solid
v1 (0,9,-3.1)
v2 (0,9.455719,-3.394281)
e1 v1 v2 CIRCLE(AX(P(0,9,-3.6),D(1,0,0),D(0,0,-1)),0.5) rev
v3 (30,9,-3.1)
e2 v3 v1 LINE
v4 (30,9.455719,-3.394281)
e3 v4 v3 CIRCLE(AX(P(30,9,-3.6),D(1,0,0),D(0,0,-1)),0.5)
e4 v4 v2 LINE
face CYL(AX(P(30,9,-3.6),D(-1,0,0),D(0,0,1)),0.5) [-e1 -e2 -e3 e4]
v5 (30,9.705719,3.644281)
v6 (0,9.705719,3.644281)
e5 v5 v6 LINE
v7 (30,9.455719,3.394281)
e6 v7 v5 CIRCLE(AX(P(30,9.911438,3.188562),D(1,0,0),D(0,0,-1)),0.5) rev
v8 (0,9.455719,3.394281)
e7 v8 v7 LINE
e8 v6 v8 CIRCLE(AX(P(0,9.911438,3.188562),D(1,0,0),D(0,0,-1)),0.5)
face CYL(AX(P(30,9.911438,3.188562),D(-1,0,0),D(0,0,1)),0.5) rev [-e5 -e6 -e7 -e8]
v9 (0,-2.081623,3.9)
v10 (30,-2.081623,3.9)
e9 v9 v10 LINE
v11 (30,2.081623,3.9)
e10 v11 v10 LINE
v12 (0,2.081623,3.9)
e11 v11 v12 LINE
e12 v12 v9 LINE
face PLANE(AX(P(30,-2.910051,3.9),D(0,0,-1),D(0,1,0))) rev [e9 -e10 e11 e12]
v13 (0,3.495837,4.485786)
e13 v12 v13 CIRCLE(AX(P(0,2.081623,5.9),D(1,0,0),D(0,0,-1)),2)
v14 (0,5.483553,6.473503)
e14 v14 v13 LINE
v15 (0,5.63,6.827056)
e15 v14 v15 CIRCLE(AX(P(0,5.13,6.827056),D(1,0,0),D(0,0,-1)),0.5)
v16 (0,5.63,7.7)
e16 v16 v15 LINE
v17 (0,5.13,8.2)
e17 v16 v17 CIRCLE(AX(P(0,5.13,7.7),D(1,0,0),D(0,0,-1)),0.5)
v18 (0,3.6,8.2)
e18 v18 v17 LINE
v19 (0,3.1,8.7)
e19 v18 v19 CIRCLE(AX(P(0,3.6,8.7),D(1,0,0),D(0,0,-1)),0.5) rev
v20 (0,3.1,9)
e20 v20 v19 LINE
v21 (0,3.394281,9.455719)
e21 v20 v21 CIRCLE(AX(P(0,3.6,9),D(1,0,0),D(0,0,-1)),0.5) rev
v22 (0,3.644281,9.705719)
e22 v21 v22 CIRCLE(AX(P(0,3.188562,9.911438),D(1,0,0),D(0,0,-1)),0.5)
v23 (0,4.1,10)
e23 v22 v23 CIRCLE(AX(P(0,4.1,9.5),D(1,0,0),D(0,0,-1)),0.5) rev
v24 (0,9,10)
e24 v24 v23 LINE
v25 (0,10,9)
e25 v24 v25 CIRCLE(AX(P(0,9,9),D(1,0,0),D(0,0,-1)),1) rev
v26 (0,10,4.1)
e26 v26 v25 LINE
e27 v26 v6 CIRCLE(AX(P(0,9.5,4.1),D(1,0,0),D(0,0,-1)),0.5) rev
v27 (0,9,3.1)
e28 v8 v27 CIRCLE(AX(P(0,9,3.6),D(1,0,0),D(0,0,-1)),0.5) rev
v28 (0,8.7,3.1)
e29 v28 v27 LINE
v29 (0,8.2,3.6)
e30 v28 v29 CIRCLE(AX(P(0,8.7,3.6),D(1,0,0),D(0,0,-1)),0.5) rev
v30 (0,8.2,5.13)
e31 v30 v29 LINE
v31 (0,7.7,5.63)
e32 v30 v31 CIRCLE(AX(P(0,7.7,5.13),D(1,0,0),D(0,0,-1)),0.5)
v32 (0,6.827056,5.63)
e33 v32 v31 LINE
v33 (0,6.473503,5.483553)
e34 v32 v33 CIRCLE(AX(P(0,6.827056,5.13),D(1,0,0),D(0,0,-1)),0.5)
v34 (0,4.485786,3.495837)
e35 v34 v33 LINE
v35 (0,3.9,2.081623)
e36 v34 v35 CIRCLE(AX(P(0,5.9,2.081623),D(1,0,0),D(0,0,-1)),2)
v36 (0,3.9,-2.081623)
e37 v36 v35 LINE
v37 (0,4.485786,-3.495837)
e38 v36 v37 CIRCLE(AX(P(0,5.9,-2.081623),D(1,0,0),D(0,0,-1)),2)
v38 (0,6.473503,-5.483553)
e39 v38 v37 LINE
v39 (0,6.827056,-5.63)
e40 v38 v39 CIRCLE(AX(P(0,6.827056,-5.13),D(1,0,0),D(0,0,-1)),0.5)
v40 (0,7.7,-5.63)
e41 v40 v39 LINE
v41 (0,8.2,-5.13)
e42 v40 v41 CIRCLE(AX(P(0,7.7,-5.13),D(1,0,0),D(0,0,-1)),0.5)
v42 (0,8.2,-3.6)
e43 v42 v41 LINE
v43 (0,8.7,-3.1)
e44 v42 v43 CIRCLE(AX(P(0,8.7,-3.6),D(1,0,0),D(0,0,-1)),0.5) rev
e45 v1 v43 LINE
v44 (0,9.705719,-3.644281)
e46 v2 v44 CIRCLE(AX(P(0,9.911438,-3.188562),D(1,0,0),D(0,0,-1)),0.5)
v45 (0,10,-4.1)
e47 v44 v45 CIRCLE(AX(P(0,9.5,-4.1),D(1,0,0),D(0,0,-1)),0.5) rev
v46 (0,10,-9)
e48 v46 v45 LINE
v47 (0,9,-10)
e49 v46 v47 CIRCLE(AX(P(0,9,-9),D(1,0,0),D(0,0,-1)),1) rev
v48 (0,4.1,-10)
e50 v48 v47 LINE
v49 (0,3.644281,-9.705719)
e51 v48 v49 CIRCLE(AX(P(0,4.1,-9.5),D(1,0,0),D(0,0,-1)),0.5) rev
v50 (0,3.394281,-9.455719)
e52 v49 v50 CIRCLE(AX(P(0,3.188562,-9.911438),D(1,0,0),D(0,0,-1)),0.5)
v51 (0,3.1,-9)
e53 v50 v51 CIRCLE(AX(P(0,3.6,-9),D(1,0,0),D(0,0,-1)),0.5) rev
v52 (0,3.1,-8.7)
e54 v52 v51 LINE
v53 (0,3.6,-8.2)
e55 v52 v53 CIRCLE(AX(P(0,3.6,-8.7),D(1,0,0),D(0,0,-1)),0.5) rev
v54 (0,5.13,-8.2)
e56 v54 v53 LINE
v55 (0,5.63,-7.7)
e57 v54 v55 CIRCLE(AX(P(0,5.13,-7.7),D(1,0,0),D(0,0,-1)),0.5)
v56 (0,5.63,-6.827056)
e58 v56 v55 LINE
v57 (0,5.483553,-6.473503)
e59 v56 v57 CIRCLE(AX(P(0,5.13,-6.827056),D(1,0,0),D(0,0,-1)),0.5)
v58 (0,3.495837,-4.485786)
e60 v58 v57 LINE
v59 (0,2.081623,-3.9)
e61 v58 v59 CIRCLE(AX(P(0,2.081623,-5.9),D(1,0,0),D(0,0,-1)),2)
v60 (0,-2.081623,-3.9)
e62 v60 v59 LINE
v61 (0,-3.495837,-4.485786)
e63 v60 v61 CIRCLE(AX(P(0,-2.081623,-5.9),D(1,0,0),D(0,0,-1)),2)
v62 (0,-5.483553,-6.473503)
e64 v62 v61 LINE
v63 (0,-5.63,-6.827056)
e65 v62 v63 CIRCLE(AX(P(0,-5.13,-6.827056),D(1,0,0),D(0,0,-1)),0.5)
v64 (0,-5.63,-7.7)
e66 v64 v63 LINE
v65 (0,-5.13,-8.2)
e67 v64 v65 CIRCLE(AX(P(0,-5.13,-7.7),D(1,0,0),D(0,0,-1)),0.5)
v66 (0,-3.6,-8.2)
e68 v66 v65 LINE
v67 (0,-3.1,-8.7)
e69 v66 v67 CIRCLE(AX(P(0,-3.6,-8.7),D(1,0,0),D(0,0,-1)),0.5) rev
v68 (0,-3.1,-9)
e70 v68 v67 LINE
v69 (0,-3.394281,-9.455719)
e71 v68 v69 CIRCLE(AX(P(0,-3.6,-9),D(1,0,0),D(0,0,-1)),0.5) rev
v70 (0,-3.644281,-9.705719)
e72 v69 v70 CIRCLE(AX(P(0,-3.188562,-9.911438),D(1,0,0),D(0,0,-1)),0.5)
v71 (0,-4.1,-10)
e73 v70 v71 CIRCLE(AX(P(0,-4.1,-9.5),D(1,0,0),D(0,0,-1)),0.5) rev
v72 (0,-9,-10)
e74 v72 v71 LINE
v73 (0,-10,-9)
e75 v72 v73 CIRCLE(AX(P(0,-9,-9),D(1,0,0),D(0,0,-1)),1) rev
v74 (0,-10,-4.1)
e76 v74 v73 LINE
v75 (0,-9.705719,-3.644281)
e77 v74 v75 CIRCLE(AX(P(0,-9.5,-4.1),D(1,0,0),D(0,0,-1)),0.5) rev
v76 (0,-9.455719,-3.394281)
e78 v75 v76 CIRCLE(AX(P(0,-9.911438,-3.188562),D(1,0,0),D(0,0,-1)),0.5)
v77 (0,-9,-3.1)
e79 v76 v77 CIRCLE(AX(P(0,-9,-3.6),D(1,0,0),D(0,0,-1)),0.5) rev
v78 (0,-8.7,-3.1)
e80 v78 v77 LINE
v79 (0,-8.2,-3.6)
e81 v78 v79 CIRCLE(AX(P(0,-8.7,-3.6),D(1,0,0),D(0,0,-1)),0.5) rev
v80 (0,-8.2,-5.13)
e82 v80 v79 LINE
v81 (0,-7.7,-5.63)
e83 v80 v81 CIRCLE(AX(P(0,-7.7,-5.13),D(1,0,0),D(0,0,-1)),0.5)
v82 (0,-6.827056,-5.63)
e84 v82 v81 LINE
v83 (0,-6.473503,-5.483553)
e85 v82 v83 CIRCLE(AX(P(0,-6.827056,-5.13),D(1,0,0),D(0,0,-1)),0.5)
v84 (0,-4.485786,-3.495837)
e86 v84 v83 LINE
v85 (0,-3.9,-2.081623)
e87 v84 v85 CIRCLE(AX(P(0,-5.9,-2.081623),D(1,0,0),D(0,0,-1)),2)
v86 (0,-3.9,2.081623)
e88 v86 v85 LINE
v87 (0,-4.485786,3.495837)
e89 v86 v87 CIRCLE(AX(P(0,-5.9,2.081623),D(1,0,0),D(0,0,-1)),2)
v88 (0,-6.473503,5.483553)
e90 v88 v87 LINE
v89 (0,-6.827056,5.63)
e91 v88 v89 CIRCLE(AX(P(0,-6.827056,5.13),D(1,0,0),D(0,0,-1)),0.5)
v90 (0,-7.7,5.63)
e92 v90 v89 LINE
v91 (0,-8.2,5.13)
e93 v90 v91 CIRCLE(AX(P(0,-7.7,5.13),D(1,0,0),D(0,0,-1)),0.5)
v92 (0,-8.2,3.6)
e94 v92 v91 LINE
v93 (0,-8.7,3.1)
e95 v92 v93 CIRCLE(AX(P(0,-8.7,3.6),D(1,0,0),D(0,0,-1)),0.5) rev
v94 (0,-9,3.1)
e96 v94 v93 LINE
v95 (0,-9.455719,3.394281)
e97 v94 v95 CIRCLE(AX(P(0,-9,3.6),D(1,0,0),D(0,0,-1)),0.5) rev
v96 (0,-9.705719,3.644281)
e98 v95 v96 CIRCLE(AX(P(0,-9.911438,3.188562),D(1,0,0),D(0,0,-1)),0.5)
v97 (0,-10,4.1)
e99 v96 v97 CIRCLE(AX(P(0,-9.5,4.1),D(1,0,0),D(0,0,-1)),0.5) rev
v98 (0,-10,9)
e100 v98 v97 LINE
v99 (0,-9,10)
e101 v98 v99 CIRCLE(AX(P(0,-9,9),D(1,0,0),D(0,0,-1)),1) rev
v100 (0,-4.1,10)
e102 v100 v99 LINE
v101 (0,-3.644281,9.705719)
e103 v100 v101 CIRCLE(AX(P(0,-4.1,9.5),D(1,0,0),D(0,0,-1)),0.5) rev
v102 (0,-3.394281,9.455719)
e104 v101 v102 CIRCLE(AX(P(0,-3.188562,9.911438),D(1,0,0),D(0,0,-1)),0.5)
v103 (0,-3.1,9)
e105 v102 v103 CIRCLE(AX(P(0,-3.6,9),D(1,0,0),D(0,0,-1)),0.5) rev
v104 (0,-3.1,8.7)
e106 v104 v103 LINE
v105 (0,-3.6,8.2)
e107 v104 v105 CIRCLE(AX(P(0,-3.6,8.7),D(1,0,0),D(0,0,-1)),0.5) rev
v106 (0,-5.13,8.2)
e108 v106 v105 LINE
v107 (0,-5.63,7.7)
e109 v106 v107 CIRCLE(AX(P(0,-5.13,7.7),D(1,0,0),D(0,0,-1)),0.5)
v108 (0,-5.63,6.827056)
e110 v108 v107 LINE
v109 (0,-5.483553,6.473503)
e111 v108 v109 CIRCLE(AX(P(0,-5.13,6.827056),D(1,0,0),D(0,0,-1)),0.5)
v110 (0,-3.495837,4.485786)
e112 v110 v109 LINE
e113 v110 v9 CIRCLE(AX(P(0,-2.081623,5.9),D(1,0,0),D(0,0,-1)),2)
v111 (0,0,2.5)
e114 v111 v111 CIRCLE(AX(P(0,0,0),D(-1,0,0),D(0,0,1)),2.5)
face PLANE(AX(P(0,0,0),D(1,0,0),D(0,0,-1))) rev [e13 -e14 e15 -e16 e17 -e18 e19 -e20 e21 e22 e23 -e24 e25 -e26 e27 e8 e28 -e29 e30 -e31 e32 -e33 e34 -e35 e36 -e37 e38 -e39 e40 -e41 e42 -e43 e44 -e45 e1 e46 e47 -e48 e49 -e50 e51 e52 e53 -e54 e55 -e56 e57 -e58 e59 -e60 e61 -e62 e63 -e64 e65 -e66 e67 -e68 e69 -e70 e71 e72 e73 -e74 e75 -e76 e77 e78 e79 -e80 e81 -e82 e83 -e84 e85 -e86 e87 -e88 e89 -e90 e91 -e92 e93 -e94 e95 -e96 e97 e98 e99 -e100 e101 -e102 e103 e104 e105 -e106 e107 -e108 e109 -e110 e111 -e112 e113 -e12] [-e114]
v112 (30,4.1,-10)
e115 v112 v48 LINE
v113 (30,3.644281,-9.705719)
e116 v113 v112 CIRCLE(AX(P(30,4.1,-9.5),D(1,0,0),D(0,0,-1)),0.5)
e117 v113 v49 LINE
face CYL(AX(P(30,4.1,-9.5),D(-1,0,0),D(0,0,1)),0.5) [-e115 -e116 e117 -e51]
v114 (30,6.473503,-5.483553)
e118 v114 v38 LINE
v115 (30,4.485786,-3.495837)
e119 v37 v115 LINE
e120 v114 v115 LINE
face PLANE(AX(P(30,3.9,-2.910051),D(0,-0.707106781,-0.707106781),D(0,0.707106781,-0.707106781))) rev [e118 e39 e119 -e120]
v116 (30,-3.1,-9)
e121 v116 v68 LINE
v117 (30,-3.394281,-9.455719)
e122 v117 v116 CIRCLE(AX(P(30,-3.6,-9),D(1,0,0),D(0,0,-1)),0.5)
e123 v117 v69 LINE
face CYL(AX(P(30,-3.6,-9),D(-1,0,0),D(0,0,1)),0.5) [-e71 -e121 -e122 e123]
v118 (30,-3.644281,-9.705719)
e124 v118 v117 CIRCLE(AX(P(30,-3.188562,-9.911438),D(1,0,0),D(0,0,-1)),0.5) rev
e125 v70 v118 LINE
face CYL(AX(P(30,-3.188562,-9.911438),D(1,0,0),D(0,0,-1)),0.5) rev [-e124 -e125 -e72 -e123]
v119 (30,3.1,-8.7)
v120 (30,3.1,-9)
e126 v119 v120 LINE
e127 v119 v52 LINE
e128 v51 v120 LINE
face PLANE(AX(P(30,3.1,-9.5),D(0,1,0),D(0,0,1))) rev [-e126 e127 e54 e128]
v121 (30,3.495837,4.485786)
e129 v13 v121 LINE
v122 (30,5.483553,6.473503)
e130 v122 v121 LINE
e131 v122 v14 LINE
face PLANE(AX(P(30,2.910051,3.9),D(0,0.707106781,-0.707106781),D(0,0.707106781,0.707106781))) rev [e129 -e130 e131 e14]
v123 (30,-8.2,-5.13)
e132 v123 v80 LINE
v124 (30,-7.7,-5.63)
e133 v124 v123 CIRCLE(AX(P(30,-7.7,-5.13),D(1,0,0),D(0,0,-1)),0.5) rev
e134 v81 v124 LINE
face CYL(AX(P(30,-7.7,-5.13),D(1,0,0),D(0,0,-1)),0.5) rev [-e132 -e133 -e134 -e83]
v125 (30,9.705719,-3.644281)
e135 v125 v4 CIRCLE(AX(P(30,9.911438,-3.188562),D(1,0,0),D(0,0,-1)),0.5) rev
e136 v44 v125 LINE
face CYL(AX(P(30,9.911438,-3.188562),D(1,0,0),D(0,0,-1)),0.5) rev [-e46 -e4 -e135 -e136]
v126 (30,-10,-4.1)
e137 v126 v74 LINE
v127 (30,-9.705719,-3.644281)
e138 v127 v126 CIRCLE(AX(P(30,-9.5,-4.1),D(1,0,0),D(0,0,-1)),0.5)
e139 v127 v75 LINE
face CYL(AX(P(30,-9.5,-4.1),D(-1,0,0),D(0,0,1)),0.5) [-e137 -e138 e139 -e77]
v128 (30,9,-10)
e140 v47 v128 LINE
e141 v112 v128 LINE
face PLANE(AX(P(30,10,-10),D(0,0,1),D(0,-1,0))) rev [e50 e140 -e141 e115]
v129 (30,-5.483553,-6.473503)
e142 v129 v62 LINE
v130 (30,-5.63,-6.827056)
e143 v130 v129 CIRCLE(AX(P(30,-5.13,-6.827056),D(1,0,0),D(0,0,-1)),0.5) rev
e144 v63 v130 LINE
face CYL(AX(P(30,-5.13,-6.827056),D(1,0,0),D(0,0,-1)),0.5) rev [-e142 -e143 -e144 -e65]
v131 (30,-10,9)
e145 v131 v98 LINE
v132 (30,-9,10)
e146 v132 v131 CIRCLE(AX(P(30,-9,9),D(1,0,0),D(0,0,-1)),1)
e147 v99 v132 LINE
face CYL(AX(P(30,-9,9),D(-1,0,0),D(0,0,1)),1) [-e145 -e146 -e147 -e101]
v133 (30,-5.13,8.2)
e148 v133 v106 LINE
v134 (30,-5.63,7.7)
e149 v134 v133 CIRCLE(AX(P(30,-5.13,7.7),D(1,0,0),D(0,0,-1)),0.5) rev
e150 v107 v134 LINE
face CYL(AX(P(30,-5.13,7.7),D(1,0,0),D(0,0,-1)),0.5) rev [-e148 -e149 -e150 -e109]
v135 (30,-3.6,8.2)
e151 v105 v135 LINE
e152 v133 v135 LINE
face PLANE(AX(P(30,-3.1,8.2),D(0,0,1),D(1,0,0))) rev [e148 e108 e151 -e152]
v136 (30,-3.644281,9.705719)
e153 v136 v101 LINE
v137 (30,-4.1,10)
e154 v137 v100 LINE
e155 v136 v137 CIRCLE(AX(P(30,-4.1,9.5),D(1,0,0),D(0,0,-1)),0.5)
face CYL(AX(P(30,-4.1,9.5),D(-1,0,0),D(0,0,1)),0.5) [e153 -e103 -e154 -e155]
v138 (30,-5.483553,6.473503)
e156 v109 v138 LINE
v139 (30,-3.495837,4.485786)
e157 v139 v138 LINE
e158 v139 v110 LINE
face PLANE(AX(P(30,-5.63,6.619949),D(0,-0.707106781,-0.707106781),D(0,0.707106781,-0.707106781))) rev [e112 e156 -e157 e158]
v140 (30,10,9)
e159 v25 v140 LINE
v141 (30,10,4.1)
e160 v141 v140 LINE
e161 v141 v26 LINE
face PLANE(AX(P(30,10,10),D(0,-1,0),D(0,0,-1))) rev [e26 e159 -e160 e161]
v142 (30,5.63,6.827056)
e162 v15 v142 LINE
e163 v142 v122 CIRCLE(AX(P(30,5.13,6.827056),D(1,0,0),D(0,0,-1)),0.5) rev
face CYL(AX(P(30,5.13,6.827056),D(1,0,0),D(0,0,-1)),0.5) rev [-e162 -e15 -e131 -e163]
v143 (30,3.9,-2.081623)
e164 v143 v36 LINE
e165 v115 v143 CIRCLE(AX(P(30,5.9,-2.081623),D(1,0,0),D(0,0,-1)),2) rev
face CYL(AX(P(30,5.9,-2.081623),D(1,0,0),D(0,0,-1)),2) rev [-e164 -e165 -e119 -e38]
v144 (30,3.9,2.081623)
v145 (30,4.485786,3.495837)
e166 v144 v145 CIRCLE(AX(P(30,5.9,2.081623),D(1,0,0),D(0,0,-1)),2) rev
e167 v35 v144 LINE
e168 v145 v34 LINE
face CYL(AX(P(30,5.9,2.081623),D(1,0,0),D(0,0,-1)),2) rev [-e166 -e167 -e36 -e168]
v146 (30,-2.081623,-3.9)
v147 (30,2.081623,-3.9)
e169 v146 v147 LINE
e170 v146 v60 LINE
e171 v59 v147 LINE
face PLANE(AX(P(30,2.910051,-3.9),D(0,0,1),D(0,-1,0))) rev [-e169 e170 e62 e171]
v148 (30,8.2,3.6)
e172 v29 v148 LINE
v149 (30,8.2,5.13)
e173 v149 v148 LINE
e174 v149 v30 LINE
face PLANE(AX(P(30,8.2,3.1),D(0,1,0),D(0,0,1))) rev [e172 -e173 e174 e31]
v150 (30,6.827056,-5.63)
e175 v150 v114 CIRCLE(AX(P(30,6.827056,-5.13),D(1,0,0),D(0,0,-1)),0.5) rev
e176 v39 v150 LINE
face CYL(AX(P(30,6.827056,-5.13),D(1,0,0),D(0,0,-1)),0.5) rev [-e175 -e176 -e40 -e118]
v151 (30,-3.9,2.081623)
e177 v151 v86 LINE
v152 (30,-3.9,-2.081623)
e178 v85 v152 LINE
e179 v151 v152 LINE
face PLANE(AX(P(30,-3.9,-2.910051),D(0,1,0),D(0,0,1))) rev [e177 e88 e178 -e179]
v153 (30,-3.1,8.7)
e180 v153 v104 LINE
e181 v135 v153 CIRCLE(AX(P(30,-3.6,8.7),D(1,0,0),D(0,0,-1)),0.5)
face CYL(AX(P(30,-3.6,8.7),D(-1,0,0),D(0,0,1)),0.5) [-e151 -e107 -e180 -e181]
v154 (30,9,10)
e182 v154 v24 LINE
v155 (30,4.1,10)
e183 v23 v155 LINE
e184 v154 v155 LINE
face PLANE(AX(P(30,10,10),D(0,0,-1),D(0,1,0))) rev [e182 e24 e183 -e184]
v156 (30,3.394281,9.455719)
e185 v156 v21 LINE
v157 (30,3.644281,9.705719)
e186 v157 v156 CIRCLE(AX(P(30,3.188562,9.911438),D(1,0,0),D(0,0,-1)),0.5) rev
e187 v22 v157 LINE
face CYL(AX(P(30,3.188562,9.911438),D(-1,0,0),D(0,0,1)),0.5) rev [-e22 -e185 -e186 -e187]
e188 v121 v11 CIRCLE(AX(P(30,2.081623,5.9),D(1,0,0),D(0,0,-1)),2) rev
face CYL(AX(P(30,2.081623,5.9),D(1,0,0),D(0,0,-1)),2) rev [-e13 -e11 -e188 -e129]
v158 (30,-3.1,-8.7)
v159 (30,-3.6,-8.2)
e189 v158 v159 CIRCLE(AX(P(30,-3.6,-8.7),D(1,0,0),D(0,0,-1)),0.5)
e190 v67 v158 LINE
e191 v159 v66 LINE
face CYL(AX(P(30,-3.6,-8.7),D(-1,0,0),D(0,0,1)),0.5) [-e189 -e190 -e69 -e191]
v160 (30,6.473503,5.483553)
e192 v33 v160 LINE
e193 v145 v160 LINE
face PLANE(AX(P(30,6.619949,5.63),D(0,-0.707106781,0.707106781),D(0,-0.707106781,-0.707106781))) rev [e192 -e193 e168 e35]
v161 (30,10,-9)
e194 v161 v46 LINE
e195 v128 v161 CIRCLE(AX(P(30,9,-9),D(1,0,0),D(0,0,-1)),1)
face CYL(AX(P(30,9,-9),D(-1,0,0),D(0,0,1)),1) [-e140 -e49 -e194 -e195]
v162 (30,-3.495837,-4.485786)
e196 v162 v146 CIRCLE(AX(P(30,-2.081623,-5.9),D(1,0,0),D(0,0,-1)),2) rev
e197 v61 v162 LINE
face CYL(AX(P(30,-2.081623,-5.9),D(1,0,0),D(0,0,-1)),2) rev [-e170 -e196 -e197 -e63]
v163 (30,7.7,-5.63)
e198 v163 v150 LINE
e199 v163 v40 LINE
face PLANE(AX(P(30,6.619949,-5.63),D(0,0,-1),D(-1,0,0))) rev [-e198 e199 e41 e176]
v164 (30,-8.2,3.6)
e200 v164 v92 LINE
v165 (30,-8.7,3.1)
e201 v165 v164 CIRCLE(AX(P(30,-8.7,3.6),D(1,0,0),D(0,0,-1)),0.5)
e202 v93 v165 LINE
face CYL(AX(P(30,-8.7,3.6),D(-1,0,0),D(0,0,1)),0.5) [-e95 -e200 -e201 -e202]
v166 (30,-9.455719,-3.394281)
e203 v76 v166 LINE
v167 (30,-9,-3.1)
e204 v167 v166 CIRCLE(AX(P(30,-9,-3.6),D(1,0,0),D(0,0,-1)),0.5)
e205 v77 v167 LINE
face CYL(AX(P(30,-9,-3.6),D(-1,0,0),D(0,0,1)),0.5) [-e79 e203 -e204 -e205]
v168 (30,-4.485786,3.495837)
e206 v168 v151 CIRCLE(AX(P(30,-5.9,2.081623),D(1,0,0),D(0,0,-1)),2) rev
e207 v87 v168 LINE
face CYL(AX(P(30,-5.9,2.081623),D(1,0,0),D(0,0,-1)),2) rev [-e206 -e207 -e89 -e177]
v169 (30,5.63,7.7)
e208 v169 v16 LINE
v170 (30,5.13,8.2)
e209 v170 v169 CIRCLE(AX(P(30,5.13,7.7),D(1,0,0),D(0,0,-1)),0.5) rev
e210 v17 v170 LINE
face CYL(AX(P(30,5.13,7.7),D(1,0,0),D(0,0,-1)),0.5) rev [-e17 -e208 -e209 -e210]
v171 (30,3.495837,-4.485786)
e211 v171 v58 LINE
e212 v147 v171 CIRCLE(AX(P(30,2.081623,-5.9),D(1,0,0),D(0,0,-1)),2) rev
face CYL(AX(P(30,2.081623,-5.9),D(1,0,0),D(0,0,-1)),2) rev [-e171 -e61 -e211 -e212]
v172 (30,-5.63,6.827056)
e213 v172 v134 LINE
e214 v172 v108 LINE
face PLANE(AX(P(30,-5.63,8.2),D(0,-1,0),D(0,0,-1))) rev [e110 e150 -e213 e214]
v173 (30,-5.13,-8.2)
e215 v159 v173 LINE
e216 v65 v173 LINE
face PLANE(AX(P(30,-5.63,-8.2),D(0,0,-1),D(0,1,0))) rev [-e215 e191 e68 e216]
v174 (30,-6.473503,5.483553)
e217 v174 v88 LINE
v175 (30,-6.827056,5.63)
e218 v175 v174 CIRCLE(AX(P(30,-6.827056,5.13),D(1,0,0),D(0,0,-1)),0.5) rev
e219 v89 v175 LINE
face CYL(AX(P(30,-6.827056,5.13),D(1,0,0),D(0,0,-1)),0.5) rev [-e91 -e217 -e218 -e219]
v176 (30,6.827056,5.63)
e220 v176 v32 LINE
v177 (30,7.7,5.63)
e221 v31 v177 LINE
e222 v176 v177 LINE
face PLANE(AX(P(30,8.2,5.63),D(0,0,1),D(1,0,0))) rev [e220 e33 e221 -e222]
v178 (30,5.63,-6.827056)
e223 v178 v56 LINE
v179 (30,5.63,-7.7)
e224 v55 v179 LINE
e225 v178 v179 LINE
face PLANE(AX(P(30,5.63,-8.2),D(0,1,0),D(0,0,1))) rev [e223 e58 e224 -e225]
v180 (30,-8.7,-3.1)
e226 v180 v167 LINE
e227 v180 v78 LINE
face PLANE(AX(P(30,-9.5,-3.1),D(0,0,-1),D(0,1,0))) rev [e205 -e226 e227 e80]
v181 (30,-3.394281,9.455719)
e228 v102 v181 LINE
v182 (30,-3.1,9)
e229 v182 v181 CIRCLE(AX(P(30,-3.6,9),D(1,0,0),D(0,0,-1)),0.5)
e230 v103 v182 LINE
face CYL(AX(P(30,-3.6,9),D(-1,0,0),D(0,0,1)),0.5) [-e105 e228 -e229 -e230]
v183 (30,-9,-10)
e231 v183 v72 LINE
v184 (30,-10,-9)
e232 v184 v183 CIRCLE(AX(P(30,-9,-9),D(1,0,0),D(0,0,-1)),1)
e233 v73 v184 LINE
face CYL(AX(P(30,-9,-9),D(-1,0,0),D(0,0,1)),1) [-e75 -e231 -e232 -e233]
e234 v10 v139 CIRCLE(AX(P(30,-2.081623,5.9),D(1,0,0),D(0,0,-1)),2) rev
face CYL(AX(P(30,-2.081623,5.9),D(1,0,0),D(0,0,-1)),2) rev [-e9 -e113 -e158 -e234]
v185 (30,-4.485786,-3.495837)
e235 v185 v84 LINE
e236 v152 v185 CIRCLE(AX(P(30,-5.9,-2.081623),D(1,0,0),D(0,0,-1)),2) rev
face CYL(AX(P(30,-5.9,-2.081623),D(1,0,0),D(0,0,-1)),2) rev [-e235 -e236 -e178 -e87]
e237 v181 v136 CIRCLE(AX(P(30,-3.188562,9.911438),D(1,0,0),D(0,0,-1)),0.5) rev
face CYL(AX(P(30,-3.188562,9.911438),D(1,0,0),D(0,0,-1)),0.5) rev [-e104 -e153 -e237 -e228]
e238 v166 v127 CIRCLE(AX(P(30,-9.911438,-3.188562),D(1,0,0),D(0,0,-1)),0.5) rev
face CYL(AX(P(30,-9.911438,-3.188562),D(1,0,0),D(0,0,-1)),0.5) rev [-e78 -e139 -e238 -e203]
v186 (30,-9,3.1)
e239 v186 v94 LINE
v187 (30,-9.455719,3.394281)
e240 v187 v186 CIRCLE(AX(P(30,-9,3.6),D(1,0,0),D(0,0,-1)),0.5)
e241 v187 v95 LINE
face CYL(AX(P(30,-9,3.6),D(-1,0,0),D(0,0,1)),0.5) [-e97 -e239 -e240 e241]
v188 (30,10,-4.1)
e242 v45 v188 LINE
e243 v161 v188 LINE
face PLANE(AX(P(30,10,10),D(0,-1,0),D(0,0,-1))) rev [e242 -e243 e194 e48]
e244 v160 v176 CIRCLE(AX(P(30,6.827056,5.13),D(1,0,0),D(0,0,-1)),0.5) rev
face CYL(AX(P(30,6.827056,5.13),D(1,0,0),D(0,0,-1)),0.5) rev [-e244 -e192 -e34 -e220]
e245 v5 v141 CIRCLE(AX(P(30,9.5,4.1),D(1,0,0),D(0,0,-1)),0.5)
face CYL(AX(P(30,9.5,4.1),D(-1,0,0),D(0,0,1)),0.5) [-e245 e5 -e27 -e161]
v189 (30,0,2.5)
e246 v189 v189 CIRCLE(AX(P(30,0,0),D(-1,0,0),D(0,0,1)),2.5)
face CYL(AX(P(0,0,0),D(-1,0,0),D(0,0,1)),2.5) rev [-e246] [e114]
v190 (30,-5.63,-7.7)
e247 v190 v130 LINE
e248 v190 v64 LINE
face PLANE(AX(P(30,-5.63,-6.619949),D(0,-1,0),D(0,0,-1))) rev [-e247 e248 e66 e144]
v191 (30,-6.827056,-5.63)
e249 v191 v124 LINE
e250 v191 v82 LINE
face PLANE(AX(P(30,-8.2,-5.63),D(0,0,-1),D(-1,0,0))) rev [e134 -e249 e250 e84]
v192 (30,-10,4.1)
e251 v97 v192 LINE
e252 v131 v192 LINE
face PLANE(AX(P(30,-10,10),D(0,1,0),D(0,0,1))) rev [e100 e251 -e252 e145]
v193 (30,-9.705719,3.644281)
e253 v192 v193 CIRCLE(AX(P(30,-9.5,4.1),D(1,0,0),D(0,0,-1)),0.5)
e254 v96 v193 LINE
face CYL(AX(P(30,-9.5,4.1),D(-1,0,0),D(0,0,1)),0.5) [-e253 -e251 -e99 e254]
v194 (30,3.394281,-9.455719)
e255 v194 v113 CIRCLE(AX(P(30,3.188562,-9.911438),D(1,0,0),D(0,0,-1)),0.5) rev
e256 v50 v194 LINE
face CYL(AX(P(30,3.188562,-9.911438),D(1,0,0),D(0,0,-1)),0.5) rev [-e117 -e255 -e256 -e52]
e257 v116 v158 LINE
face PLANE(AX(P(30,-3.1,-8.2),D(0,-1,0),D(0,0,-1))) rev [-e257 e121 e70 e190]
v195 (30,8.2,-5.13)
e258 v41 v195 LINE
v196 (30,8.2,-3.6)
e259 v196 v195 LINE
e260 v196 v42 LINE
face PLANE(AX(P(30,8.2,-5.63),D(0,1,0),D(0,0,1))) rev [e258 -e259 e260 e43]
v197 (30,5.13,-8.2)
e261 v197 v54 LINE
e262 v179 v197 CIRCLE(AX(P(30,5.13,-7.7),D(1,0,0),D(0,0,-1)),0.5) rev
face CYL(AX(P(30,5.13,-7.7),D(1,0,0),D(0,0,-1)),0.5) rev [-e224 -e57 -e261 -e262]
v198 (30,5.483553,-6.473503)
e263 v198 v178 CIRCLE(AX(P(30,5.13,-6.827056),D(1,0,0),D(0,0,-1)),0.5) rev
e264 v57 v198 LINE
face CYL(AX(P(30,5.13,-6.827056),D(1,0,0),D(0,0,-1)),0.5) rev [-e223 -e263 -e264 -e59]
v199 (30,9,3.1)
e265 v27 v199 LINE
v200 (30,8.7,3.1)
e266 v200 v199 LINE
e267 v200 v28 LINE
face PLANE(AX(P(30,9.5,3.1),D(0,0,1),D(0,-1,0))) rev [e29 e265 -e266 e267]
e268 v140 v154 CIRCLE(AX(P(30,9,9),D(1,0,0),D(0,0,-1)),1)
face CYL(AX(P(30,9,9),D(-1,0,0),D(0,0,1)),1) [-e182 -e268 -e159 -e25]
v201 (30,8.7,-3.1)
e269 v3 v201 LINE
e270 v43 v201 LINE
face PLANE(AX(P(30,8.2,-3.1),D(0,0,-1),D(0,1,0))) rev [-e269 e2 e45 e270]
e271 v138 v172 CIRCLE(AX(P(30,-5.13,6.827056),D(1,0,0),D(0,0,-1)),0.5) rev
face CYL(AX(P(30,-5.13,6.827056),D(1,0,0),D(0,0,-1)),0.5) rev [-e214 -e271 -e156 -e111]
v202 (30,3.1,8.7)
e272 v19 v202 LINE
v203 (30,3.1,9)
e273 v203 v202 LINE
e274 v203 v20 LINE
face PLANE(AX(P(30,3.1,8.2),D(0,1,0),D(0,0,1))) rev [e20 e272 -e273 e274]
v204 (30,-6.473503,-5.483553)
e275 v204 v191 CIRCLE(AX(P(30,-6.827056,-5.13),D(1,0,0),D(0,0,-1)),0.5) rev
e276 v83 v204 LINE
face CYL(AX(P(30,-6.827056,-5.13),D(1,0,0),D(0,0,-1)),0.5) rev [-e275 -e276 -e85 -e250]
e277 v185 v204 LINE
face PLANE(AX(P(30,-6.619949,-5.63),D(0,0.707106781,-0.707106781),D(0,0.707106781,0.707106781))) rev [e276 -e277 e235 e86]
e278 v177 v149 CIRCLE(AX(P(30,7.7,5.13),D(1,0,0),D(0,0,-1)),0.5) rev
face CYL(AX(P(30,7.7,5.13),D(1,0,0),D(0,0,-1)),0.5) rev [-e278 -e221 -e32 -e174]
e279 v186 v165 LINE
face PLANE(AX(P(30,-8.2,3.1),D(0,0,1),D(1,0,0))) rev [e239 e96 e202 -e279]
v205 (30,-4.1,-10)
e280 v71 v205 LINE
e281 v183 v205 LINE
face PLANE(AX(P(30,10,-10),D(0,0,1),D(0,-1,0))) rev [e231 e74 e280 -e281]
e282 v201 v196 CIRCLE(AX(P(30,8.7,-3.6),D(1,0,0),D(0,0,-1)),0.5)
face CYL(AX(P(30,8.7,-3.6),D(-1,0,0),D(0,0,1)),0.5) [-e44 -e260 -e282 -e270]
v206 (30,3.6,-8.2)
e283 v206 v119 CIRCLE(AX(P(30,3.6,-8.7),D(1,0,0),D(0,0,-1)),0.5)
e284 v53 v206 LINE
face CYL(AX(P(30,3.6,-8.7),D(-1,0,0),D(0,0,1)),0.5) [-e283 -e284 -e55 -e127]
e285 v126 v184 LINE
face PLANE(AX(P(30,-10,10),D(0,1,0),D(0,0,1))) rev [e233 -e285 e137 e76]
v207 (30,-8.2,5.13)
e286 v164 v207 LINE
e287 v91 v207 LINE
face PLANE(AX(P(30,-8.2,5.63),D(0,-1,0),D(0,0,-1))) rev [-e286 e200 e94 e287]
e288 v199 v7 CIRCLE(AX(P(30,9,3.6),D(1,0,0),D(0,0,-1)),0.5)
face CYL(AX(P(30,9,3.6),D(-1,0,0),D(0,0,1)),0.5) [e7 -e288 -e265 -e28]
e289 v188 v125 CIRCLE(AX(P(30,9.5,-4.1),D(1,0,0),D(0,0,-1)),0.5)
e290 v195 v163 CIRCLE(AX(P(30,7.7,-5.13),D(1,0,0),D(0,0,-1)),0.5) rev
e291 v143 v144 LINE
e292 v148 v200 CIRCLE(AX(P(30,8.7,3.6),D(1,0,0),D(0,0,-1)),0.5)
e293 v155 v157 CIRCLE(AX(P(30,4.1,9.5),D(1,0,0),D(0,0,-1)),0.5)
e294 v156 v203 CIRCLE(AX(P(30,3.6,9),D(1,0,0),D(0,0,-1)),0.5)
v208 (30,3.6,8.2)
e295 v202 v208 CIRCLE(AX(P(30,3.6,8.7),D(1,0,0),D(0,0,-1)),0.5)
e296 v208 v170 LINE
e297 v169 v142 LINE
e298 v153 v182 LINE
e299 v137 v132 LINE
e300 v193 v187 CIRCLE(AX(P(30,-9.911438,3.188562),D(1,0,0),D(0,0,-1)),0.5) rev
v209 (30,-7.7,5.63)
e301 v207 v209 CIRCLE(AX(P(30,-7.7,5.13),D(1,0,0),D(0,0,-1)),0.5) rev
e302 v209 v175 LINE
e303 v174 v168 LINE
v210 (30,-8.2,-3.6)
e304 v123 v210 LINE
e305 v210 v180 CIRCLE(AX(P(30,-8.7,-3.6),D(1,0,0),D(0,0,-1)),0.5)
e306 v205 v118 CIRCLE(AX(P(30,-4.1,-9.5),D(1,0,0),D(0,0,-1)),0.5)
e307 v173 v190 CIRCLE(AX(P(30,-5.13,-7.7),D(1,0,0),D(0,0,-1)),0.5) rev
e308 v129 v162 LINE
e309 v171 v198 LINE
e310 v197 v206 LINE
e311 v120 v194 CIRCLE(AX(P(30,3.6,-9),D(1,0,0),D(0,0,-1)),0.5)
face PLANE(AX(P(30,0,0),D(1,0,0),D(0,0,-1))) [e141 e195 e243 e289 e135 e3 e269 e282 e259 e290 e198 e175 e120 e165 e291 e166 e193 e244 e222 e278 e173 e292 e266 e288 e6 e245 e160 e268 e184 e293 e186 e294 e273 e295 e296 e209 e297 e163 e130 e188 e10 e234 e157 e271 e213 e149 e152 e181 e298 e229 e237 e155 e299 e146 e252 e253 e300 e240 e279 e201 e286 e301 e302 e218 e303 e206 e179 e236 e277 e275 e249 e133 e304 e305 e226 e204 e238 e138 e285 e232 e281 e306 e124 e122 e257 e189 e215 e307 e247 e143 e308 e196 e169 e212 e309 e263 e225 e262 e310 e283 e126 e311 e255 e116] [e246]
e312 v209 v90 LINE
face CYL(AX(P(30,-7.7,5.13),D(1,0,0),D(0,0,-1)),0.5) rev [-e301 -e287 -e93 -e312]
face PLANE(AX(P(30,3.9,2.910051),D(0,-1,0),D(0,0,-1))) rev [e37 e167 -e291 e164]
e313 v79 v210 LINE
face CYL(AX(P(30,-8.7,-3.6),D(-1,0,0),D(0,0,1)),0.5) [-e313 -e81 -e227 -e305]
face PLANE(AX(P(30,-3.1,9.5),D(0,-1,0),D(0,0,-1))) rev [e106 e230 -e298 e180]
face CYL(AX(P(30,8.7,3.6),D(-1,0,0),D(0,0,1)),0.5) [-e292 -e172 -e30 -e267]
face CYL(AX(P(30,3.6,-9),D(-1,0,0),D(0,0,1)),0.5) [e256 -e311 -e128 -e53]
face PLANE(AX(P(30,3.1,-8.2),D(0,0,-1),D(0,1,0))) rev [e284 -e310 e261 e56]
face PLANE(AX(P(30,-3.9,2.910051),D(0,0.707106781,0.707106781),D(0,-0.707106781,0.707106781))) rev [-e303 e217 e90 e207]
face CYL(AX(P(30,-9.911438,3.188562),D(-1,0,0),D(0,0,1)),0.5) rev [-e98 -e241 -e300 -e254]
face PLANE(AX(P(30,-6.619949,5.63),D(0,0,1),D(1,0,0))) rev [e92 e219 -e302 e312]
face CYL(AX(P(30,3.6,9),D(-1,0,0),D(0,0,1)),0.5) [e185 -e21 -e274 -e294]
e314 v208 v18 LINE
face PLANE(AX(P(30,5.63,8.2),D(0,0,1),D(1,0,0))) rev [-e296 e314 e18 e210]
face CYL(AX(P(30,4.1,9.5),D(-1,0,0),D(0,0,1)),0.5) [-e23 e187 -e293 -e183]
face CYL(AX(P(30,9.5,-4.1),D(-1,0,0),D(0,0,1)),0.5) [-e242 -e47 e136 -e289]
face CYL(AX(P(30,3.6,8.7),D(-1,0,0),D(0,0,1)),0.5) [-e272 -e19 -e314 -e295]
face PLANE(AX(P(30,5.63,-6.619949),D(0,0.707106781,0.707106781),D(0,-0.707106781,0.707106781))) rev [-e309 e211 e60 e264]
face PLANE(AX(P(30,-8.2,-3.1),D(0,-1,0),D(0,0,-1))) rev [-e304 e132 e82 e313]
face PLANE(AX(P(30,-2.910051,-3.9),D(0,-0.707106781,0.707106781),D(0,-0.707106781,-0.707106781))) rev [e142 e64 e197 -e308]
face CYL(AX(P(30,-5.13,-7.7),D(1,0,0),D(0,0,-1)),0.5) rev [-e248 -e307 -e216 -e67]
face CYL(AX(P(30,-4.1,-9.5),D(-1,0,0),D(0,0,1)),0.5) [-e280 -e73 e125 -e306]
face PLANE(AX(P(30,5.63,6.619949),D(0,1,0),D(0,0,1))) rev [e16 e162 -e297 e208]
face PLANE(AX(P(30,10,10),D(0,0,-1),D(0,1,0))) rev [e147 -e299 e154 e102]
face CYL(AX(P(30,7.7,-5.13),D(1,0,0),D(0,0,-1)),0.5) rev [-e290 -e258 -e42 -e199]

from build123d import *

# Parameters (mm, degrees)
SKETCH1_W                = 20
SKETCH1_H                = 20
BOSS_EXTRUDE1_DEPTH      = 30
FILLET1_R                = 1
CUT_EXTRUDE1_DEPTH       = 34.166247904
F_5_0_5_DIAMETER_HOLE1_D = 5
FILLET2_R                = 2
FILLET3_R                = 0.5
FILLET4_R                = 0.5
FILLET5_R                = 0.5


with BuildPart() as part:
    # Sketch1 → Boss-Extrude1 (new body)
    with BuildSketch(Plane(origin=(0, 0, 0), x_dir=(0, 0, -1), z_dir=(1, 0, 0))):
        Rectangle(SKETCH1_W, SKETCH1_H)
    extrude(amount=BOSS_EXTRUDE1_DEPTH)

    # Fillet1
    fillet1_edges = [part.edges().sort_by_distance(p)[0] for p in [
        (15, 10, 10),
        (15, 10, -10),
        (15, -10, -10),
        (15, -10, 10),
    ]]
    fillet(fillet1_edges, radius=FILLET1_R)

    # Sketch3 → Cut-Extrude1 (cut, through all)
    with BuildSketch(Plane.ZY):
        Polygon((-3.6, 10), (3.6, 10), (3.6, 9.5), (3.1, 9.5), (3.1, 8.2), (5.63, 8.2), (5.63, 6.619949494), (2.910050506, 3.9), (-2.910050506, 3.9), (-5.63, 6.619949494), (-5.63, 8.2), (-3.1, 8.2), (-3.1, 9.5), (-3.6, 9.5), align=None)
        Polygon((10, 3.6), (10, -3.6), (9.5, -3.6), (9.5, -3.1), (8.2, -3.1), (8.2, -5.63), (6.619949494, -5.63), (3.9, -2.910050506), (3.9, 2.910050506), (6.619949494, 5.63), (8.2, 5.63), (8.2, 3.1), (9.5, 3.1), (9.5, 3.6), align=None)
        Polygon((3.6, -10), (-3.6, -10), (-3.6, -9.5), (-3.1, -9.5), (-3.1, -8.2), (-5.63, -8.2), (-5.63, -6.619949494), (-2.910050506, -3.9), (2.910050506, -3.9), (5.63, -6.619949494), (5.63, -8.2), (3.1, -8.2), (3.1, -9.5), (3.6, -9.5), align=None)
        Polygon((-10, -3.6), (-10, 3.6), (-9.5, 3.6), (-9.5, 3.1), (-8.2, 3.1), (-8.2, 5.63), (-6.619949494, 5.63), (-3.9, 2.910050506), (-3.9, -2.910050506), (-6.619949494, -5.63), (-8.2, -5.63), (-8.2, -3.1), (-9.5, -3.1), (-9.5, -3.6), align=None)
    extrude(amount=-CUT_EXTRUDE1_DEPTH, mode=Mode.SUBTRACT)

    # Ø5.0 (5) Diameter Hole1 (through all)
    with Locations(Plane.ZY):
        with Locations((0, 0)):
            Hole(F_5_0_5_DIAMETER_HOLE1_D / 2)

    # Fillet2
    fillet2_edges = [part.edges().sort_by_distance(p)[0] for p in [
        (15, -3.9, -2.910050506),
        (15, -3.9, 2.910050506),
        (15, 2.910050506, -3.9),
        (15, -2.910050506, -3.9),
        (15, -2.910050506, 3.9),
        (15, 2.910050506, 3.9),
        (15, 3.9, 2.910050506),
        (15, 3.9, -2.910050506),
    ]]
    fillet(fillet2_edges, radius=FILLET2_R)

    # Fillet3
    fillet3_edges = [part.edges().sort_by_distance(p)[0] for p in [
        (15, 3.6, -10),
        (15, 3.1, -9.5),
        (15, 3.1, -8.2),
        (15, 5.63, -8.2),
        (15, 5.63, -6.619949494),
        (15, 3.6, 10),
        (15, 3.1, 9.5),
        (15, 3.1, 8.2),
        (15, 5.63, 8.2),
        (15, 5.63, 6.619949494),
        (15, 6.619949494, 5.63),
        (15, 8.2, 5.63),
        (15, 8.2, 3.1),
        (15, 9.5, 3.1),
        (15, 10, 3.6),
        (15, 9.5, -3.1),
        (15, 10, -3.6),
        (15, 8.2, -3.1),
        (15, 8.2, -5.63),
        (15, 6.619949494, -5.63),
    ]]
    fillet(fillet3_edges, radius=FILLET3_R - 0.0001)  # a hair under: the kernel refuses the full size

    # Fillet4
    fillet4_edges = [part.edges().sort_by_distance(p)[0] for p in [
        (15, -3.6, 10),
        (15, -3.1, 9.5),
        (15, -3.1, 8.2),
        (15, -5.63, 8.2),
        (15, -5.63, 6.619949494),
        (15, -6.619949494, 5.63),
        (15, -8.2, 5.63),
        (15, -8.2, 3.1),
        (15, -10, 3.6),
        (15, -9.5, 3.1),
        (15, -10, -3.6),
        (15, -9.5, -3.1),
        (15, -8.2, -3.1),
        (15, -8.2, -5.63),
        (15, -6.619949494, -5.63),
        (15, -5.63, -6.619949494),
        (15, -5.63, -8.2),
        (15, -3.1, -8.2),
        (15, -3.1, -9.5),
        (15, -3.6, -10),
    ]]
    fillet(fillet4_edges, radius=FILLET4_R - 0.0001)  # a hair under: the kernel refuses the full size

    # Fillet5
    fillet5_edges = [part.edges().sort_by_distance(p)[0] for p in [
        (15, 3.6, 9.5),
        (15, 9.5, 3.6),
        (15, 9.5, -3.6),
        (15, 3.6, -9.5),
        (15, -3.6, 9.5),
        (15, -9.5, 3.6),
        (15, -9.5, -3.6),
        (15, -3.6, -9.5),
    ]]
    fillet(fillet5_edges, radius=FILLET5_R)


solid = part.part
